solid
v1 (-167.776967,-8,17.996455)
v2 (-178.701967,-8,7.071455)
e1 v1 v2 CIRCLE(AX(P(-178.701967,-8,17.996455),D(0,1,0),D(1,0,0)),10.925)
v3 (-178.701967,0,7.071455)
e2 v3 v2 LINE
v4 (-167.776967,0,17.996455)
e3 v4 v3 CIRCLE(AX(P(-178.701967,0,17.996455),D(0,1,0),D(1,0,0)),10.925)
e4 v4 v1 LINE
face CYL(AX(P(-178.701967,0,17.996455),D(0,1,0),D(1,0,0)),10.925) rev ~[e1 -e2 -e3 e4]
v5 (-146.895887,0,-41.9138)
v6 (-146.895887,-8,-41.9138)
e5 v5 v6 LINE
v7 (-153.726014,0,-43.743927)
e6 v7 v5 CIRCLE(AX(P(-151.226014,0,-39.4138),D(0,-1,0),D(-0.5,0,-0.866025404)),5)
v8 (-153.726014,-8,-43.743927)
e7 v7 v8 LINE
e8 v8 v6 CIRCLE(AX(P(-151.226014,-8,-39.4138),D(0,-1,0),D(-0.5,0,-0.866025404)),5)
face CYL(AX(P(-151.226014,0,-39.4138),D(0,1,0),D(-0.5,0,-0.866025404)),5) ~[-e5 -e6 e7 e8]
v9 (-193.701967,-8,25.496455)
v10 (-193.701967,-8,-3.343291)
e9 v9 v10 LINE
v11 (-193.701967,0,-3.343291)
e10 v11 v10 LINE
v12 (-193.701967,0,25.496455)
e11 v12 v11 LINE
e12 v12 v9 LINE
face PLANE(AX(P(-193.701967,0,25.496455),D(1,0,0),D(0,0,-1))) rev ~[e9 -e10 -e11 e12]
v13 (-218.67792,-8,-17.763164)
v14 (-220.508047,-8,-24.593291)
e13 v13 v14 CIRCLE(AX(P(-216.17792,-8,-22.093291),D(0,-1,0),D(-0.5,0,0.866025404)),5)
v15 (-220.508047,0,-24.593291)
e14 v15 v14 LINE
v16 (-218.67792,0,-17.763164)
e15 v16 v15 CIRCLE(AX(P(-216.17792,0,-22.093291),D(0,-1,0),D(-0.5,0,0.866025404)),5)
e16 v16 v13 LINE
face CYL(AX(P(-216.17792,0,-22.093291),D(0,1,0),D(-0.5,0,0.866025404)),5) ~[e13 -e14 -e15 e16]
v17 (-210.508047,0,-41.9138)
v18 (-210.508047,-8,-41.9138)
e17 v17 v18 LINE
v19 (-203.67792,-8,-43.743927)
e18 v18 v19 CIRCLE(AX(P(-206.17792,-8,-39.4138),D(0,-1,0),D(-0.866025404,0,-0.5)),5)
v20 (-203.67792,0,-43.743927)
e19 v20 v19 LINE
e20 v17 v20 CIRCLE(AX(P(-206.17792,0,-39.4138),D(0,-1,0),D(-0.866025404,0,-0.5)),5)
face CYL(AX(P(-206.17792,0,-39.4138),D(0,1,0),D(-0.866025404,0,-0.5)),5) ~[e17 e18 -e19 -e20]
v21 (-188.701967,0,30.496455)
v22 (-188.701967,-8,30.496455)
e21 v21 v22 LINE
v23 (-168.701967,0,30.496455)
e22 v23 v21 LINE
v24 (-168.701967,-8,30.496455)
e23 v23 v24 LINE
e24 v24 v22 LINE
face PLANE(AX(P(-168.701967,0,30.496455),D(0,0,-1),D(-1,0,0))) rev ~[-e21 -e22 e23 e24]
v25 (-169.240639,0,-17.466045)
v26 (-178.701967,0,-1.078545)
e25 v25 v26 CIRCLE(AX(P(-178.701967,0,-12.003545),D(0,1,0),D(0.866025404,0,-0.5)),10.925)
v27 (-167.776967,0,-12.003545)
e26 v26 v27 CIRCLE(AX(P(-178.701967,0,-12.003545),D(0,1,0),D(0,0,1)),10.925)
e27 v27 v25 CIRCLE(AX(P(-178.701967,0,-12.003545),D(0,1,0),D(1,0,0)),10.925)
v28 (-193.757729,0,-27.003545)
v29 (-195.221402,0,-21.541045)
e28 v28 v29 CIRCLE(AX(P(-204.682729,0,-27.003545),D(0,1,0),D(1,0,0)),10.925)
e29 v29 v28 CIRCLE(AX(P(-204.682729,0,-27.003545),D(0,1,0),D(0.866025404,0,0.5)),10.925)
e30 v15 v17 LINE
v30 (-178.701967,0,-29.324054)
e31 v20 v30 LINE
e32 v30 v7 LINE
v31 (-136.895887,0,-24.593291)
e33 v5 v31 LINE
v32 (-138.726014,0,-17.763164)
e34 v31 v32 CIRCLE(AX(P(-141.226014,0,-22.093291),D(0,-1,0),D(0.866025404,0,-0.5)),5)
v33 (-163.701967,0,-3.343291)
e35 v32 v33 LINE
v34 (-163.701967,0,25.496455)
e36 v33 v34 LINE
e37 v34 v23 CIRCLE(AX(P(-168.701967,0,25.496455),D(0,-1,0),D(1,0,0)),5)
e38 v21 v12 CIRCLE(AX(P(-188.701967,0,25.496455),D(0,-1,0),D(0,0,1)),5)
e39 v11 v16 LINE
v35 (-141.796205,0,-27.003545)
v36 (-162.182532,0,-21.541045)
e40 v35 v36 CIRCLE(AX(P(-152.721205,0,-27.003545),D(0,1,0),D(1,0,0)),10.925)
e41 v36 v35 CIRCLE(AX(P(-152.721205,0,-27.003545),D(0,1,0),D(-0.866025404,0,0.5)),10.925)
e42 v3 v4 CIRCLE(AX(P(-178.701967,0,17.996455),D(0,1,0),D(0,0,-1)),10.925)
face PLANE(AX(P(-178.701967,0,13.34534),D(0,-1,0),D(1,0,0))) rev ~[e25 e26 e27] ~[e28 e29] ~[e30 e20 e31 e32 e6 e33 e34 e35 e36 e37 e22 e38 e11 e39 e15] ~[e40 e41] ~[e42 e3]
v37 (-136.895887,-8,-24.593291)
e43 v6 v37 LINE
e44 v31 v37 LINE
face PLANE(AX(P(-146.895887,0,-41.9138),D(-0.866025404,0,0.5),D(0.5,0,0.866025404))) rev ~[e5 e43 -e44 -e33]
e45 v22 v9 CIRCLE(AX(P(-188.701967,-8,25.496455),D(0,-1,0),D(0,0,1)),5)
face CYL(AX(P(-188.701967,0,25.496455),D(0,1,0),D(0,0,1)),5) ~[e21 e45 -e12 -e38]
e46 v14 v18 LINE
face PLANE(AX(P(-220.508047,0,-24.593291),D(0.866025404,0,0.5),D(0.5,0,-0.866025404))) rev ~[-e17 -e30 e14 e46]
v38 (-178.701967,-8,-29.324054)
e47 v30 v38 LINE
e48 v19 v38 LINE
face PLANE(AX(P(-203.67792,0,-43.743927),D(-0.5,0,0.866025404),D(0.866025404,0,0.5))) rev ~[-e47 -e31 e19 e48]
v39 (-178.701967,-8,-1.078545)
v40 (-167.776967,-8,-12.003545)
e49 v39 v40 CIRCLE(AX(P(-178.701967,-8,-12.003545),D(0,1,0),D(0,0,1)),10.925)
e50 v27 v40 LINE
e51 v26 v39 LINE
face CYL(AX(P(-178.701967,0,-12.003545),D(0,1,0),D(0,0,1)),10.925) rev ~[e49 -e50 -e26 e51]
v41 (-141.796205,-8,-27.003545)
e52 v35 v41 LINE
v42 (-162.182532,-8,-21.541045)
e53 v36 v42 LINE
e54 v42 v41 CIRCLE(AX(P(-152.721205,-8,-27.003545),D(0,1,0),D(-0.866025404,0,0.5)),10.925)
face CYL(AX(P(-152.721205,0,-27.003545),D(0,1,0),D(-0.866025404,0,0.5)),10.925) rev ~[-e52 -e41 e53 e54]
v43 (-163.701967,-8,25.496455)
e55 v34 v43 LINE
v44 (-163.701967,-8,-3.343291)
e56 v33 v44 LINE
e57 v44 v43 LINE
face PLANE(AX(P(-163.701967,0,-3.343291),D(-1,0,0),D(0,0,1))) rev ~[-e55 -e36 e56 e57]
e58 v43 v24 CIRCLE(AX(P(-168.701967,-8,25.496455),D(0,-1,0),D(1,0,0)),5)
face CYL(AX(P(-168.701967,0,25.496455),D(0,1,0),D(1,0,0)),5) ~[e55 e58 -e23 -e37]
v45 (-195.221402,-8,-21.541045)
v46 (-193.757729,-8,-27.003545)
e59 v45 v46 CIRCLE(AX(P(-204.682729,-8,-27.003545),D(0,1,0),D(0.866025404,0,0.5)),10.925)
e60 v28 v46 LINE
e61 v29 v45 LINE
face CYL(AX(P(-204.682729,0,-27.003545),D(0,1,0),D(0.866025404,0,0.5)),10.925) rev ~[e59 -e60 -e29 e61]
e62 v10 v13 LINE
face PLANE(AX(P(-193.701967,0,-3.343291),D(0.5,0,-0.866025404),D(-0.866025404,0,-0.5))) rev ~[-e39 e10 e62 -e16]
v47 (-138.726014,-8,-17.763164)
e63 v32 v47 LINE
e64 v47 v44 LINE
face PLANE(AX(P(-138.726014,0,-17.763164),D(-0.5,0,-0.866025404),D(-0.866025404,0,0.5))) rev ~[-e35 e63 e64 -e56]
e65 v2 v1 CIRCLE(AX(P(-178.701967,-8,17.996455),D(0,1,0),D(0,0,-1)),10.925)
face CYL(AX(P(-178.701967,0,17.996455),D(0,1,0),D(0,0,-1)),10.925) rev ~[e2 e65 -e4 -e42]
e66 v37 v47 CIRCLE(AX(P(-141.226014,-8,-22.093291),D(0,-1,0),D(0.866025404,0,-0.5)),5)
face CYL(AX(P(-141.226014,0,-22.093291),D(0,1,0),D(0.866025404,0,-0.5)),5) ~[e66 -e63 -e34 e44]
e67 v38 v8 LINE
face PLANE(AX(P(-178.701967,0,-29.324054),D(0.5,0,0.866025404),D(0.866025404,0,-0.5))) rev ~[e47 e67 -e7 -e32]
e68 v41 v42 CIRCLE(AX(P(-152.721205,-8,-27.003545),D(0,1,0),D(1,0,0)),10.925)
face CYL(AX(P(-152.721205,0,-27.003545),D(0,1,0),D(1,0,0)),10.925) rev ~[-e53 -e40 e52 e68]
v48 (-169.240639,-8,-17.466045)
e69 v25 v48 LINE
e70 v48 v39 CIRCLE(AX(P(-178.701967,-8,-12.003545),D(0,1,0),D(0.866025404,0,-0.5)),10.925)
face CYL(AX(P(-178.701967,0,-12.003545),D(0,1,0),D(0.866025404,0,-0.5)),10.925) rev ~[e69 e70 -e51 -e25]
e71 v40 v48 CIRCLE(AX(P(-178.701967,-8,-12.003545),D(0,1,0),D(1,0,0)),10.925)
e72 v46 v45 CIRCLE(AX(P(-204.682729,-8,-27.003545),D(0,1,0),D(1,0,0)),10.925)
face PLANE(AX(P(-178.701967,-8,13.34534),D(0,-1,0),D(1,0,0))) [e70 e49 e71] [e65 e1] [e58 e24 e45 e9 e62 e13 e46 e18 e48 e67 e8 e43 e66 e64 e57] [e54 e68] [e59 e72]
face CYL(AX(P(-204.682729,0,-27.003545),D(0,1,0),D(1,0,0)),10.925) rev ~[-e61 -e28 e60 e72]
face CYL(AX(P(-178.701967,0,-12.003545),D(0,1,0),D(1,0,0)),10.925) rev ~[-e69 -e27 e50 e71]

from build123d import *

# Parameters (mm, degrees)
F1_DEPTH = 8


with BuildPart() as f1:
    # F0 (on Front) → F1 (new body)
    with BuildSketch(Plane.XZ):
        with BuildLine():
            Line((-182.0272845483, 7.2368355937), (-178.701967001, 5.3169626126))
            Line((-178.701967001, 5.3169626126), (-175.3766494537, 7.2368355937))
            Line((-175.3766494537, 7.2368355937), (-172.0513319064, 1.4772166504))
            Line((-172.0513319064, 1.4772166504), (-163.701967001, -3.3432914252))
            Line((-163.701967001, -3.3432914252), (-163.701967001, 25.4964545369))
            ThreePointArc((-163.701967001, 25.4964545369), (-165.166433095, 29.0319884428), (-168.701967001, 30.4964545369))
            Line((-168.701967001, 30.4964545369), (-188.701967001, 30.4964545369))
            ThreePointArc((-188.701967001, 30.4964545369), (-192.2375009069, 29.0319884428), (-193.701967001, 25.4964545369))
            Line((-193.701967001, 25.4964545369), (-193.701967001, -3.3432914252))
            Line((-193.701967001, -3.3432914252), (-185.3526020956, 1.4772166504))
            Line((-185.3526020956, 1.4772166504), (-182.0272845483, 7.2368355937))
        make_face()
        with BuildLine():
            ThreePointArc((-167.776967001, 17.9964545369), (-170.9768254165, 10.2713129525), (-178.701967001, 7.0714545369))
            ThreePointArc((-178.701967001, 7.0714545369), (-186.4271085854, 25.7215961214), (-167.776967001, 17.9964545369))
        make_face(mode=Mode.SUBTRACT)
        with BuildLine():
            Line((-160.3766494537, -18.7439265199), (-163.701967001, -20.6637995009))
            Line((-163.701967001, -20.6637995009), (-163.701967001, -24.5035454631))
            Line((-163.701967001, -24.5035454631), (-170.3526020956, -24.5035454631))
            Line((-170.3526020956, -24.5035454631), (-178.701967001, -29.3240535388))
            Line((-178.701967001, -29.3240535388), (-153.726014359, -43.7439265199))
            ThreePointArc((-153.726014359, -43.7439265199), (-149.9319191335, -44.2434286324), (-146.8958873401, -41.9137995009))
            Line((-146.8958873401, -41.9137995009), (-136.8958873401, -24.5932914252))
            ThreePointArc((-136.8958873401, -24.5932914252), (-136.3963852276, -20.7991961997), (-138.726014359, -17.7631644063))
            Line((-138.726014359, -17.7631644063), (-163.701967001, -3.3432914252))
            Line((-163.701967001, -3.3432914252), (-163.701967001, -12.9843075766))
            Line((-163.701967001, -12.9843075766), (-160.3766494537, -18.7439265199))
        make_face()
        with BuildLine():
            ThreePointArc((-141.7962048874, -27.0035454631), (-155.5488029552, -37.5562851153), (-162.1825324238, -21.5410454631))
            ThreePointArc((-162.1825324238, -21.5410454631), (-149.8936068197, -16.4508058109), (-141.7962048874, -27.0035454631))
        make_face(mode=Mode.SUBTRACT)
        with BuildLine():
            Line((-193.701967001, -24.5035454631), (-193.701967001, -20.6637995009))
            Line((-193.701967001, -20.6637995009), (-197.0272845483, -18.7439265199))
            Line((-197.0272845483, -18.7439265199), (-193.701967001, -12.9843075766))
            Line((-193.701967001, -12.9843075766), (-193.701967001, -3.3432914252))
            Line((-193.701967001, -3.3432914252), (-218.6779196429, -17.7631644063))
            ThreePointArc((-218.6779196429, -17.7631644063), (-221.0075487743, -20.7991961997), (-220.5080466618, -24.5932914252))
            Line((-220.5080466618, -24.5932914252), (-210.5080466618, -41.9137995009))
            ThreePointArc((-210.5080466618, -41.9137995009), (-207.4720148684, -44.2434286324), (-203.6779196429, -43.7439265199))
            Line((-203.6779196429, -43.7439265199), (-178.701967001, -29.3240535388))
            Line((-178.701967001, -29.3240535388), (-187.0513319064, -24.5035454631))
            Line((-187.0513319064, -24.5035454631), (-193.701967001, -24.5035454631))
        make_face()
        with BuildLine():
            ThreePointArc((-193.7577291145, -27.0035454631), (-215.2354687667, -29.8311435308), (-195.2214015781, -21.5410454631))
            ThreePointArc((-195.2214015781, -21.5410454631), (-194.1299894623, -24.1759473953), (-193.7577291145, -27.0035454631))
        make_face(mode=Mode.SUBTRACT)
        Polygon((-193.701967001, -12.9843075766), (-185.3526020956, 1.4772166504), (-193.701967001, -3.3432914252), align=None)
        Polygon((-163.701967001, -3.3432914252), (-172.0513319064, 1.4772166504), (-163.701967001, -12.9843075766), align=None)
        Polygon((-178.701967001, -29.3240535388), (-170.3526020956, -24.5035454631), (-187.0513319064, -24.5035454631), align=None)
        with BuildLine():
            ThreePointArc((-188.1632945373, -17.4660454631), (-188.1632945373, -6.5410454631), (-178.701967001, -1.0785454631))
            Line((-178.701967001, -1.0785454631), (-178.701967001, 5.3169626126))
            Line((-178.701967001, 5.3169626126), (-185.3526020956, 1.4772166504))
            Line((-185.3526020956, 1.4772166504), (-193.701967001, -12.9843075766))
            Line((-193.701967001, -12.9843075766), (-193.701967001, -20.6637995009))
            Line((-193.701967001, -20.6637995009), (-188.1632945373, -17.4660454631))
        make_face()
        with BuildLine():
            ThreePointArc((-178.701967001, -1.0785454631), (-170.9768254165, -4.2784038786), (-167.776967001, -12.0035454631))
            ThreePointArc((-167.776967001, -12.0035454631), (-168.1492273488, -14.8311435308), (-169.2406394646, -17.4660454631))
            Line((-169.2406394646, -17.4660454631), (-163.701967001, -20.6637995009))
            Line((-163.701967001, -20.6637995009), (-163.701967001, -12.9843075766))
            Line((-163.701967001, -12.9843075766), (-172.0513319064, 1.4772166504))
            Line((-172.0513319064, 1.4772166504), (-178.701967001, 5.3169626126))
            Line((-178.701967001, 5.3169626126), (-178.701967001, -1.0785454631))
        make_face()
        Polygon((-175.3766494537, 7.2368355937), (-178.701967001, 5.3169626126), (-172.0513319064, 1.4772166504), align=None)
        Polygon((-185.3526020956, 1.4772166504), (-178.701967001, 5.3169626126), (-182.0272845483, 7.2368355937), align=None)
        with BuildLine():
            Line((-163.701967001, -20.6637995009), (-169.2406394646, -17.4660454631))
            ThreePointArc((-169.2406394646, -17.4660454631), (-178.701967001, -22.9285454631), (-188.1632945373, -17.4660454631))
            Line((-188.1632945373, -17.4660454631), (-193.701967001, -20.6637995009))
            Line((-193.701967001, -20.6637995009), (-187.0513319064, -24.5035454631))
            Line((-187.0513319064, -24.5035454631), (-170.3526020956, -24.5035454631))
            Line((-170.3526020956, -24.5035454631), (-163.701967001, -20.6637995009))
        make_face()
        Polygon((-163.701967001, -12.9843075766), (-163.701967001, -20.6637995009), (-160.3766494537, -18.7439265199), align=None)
        Polygon((-163.701967001, -24.5035454631), (-163.701967001, -20.6637995009), (-170.3526020956, -24.5035454631), align=None)
        Polygon((-187.0513319064, -24.5035454631), (-193.701967001, -20.6637995009), (-193.701967001, -24.5035454631), align=None)
        Polygon((-197.0272845483, -18.7439265199), (-193.701967001, -20.6637995009), (-193.701967001, -12.9843075766), align=None)
    extrude(amount=F1_DEPTH)


solid = f1.part
